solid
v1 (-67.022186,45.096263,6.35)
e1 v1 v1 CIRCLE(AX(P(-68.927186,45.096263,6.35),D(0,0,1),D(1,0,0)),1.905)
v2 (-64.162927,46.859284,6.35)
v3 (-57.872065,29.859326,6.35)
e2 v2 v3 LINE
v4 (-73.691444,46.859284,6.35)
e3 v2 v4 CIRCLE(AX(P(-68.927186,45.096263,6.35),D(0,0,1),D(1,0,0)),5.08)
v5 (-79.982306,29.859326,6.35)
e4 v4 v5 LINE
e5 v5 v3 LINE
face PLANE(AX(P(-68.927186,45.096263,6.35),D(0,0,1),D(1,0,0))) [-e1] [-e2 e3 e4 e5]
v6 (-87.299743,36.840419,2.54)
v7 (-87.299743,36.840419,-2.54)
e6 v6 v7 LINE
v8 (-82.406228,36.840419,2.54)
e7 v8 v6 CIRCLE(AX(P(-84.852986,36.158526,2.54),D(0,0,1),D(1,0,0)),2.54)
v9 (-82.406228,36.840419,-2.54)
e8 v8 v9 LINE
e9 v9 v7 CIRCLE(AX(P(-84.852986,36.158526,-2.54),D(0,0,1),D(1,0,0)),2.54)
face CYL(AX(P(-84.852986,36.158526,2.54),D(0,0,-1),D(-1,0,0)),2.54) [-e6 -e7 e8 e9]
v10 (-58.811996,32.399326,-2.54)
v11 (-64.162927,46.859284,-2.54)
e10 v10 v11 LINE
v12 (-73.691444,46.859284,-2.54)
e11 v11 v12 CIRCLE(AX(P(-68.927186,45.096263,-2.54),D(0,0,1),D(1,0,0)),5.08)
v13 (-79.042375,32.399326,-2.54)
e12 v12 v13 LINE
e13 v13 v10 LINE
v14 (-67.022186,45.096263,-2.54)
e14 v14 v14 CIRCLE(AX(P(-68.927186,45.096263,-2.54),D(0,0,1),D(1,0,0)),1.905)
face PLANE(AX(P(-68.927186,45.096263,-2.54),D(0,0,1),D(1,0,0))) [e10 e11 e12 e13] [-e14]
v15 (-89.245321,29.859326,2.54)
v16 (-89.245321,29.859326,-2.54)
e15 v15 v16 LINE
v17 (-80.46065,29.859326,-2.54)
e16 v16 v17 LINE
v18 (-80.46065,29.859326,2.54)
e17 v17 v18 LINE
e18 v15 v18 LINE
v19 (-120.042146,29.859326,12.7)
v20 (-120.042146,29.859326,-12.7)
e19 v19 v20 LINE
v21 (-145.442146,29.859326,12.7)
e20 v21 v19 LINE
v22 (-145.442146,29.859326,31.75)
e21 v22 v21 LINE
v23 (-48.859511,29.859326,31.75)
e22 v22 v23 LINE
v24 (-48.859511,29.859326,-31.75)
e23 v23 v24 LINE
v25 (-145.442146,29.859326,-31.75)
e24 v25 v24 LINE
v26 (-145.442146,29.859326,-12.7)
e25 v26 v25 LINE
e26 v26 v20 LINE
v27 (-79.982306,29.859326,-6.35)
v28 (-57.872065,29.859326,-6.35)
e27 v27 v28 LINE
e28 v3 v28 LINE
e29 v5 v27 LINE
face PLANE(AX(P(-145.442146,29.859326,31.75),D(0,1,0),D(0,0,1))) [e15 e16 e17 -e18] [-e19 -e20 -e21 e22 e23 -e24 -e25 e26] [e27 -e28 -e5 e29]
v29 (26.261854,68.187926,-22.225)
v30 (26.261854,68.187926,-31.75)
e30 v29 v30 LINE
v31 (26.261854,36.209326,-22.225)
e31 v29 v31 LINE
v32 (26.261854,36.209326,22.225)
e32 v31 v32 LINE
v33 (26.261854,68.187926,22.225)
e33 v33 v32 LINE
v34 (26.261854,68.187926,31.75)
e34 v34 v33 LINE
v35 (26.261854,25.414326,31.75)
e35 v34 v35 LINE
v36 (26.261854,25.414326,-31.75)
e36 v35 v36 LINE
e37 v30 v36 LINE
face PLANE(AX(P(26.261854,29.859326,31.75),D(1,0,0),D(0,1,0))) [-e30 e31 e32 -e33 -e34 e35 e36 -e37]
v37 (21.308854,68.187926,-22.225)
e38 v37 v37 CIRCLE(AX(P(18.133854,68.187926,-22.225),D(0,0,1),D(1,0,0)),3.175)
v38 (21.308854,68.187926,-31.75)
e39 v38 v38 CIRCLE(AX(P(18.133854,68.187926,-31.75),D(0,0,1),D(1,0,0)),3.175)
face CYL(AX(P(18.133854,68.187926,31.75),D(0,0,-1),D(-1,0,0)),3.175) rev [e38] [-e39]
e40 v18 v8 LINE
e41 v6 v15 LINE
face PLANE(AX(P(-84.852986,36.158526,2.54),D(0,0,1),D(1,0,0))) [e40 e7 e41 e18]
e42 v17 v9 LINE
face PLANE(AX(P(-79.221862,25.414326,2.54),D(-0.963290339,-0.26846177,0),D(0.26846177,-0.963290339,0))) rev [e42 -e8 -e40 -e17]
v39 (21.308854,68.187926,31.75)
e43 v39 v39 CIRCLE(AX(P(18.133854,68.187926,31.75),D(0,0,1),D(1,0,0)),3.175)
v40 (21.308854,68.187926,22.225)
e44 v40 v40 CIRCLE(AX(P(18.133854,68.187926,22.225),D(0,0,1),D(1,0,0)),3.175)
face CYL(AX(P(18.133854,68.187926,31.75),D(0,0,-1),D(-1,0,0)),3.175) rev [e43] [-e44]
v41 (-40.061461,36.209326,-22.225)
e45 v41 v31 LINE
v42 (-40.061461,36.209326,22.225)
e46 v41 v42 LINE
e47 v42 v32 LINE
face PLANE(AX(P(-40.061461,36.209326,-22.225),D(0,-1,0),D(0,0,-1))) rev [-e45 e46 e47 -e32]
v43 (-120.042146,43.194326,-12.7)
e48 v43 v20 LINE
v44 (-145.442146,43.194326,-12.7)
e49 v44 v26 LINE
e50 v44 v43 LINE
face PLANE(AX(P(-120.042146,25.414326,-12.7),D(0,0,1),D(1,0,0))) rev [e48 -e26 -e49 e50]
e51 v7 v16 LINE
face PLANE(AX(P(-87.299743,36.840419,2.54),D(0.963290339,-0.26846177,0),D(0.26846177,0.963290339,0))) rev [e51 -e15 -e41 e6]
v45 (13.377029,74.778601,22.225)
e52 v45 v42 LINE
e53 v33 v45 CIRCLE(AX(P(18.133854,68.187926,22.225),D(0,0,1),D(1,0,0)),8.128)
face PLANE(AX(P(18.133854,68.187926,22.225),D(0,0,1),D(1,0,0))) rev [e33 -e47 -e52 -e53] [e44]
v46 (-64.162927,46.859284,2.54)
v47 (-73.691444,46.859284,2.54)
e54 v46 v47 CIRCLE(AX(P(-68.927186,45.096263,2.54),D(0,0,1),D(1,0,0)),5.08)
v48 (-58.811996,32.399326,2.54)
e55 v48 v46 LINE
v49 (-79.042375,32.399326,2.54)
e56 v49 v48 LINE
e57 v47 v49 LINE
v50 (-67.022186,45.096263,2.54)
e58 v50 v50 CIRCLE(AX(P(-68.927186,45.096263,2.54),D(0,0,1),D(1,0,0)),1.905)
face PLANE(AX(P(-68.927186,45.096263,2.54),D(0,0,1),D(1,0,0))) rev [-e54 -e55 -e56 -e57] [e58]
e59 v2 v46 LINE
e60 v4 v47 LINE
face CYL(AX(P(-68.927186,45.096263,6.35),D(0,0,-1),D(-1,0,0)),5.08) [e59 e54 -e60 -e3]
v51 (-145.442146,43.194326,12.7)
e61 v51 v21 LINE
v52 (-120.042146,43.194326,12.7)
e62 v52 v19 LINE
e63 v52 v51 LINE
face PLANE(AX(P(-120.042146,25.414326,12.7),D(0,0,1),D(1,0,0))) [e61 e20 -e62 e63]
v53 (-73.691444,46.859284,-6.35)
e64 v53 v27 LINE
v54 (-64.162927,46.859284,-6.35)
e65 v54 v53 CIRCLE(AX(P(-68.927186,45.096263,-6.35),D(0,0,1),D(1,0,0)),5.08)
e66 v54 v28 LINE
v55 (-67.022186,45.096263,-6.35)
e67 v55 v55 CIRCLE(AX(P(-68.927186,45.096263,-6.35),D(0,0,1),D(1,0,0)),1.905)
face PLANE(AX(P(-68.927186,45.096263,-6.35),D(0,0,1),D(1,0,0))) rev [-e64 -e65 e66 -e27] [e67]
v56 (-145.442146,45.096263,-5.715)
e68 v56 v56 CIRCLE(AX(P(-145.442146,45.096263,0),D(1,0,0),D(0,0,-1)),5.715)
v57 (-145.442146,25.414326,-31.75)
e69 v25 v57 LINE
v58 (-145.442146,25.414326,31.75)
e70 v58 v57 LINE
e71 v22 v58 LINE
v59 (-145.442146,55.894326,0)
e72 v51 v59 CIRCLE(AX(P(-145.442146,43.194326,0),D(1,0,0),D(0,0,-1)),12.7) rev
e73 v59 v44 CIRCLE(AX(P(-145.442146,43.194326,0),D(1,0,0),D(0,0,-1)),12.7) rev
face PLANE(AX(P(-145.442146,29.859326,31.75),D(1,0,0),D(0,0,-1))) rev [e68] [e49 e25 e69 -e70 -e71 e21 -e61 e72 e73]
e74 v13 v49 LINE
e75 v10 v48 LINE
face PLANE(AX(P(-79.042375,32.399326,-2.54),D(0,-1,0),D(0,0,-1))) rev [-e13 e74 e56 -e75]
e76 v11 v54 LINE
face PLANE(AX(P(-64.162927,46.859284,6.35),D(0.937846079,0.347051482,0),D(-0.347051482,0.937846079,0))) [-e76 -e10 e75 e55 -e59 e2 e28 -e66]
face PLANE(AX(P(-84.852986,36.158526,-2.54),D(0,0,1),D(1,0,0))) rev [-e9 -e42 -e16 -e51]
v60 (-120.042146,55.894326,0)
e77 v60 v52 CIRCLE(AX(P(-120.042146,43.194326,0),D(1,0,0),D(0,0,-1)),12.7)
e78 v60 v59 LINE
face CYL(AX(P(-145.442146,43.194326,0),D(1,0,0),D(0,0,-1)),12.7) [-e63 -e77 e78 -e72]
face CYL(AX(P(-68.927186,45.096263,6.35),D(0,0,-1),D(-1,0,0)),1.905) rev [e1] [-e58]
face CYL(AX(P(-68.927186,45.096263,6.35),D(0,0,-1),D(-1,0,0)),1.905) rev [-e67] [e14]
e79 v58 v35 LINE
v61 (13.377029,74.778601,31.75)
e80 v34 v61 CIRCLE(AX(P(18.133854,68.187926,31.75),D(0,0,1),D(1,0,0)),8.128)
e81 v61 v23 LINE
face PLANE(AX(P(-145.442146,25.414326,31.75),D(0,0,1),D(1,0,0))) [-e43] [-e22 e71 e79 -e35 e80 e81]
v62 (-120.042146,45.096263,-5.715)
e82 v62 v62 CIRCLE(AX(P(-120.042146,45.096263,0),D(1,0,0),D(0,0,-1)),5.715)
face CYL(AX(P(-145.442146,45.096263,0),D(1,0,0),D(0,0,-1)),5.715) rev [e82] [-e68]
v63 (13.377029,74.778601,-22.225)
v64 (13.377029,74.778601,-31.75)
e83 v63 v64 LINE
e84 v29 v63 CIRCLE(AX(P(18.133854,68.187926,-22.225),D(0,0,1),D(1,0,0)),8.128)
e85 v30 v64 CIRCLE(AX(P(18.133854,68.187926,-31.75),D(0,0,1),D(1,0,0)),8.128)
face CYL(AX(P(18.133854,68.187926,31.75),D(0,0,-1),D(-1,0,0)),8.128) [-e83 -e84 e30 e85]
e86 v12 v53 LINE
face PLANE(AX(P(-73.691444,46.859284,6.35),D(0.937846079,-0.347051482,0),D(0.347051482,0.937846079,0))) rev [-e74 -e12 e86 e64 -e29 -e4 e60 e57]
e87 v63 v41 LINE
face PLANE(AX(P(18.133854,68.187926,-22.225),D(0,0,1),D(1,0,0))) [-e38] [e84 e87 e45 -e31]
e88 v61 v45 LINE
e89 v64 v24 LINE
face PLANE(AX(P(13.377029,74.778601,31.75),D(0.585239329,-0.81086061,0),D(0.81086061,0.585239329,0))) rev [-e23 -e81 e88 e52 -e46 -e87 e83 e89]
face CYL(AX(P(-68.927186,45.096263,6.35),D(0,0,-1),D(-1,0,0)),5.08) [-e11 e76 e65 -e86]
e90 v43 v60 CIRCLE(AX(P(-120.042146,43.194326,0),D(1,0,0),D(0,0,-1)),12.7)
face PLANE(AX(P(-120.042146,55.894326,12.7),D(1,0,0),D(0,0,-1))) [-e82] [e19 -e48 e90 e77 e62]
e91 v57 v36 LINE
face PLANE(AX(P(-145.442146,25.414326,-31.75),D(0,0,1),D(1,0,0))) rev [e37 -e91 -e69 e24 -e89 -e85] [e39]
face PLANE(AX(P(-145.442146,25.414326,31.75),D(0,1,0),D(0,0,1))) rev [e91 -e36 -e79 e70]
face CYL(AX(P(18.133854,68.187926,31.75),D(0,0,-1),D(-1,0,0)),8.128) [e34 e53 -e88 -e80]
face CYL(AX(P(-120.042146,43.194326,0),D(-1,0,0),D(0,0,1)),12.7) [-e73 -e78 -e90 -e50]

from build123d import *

# Parameters (mm, degrees)
SKETCH1_W           = 171.704
SKETCH1_H           = 4.445
BASE_EXTRUDE_DEPTH  = 31.75
SKETCH4_W           = 25.4
SKETCH4_H           = 30.48
BOSS_EXTRUDE3_DEPTH = 12.7
SKETCH5_R           = 5.715
CUT_EXTRUDE1_DEPTH  = 160.803312245
SKETCH3_R           = 1.905
BOSS_EXTRUDE1_DEPTH = 6.35
SKETCH2_R           = 3.175
BOSS_EXTRUDE2_DEPTH = 31.75
FILLET1_R           = 12.7
CUT_EXTRUDE2_DEPTH  = 2.54
CUT_EXTRUDE4_DEPTH  = 22.225
BOSS_EXTRUDE4_DEPTH = 2.54


with BuildPart() as part:
    # Sketch1 → Base-Extrude (new, symmetric)
    with BuildSketch(Plane.XY):
        with Locations((-59.590145552, 27.636826085)):
            Rectangle(SKETCH1_W, SKETCH1_H)
    extrude(amount=BASE_EXTRUDE_DEPTH, both=True)

    # Sketch4 → Boss-Extrude3 (add, symmetric)
    with BuildSketch(Plane.XY):
        with Locations((-132.742145552, 40.654326085)):
            Rectangle(SKETCH4_W, SKETCH4_H)
    extrude(amount=BOSS_EXTRUDE3_DEPTH, both=True)

    # Sketch5 → Cut-Extrude1 (cut, through all)
    with BuildSketch(Plane(origin=(-120.042145552, 0, 0), x_dir=(0, 0, -1), z_dir=(1, 0, 0))):
        with Locations((0, 45.096262506)):
            Circle(SKETCH5_R)
    extrude(amount=-CUT_EXTRUDE1_DEPTH, mode=Mode.SUBTRACT)

    # Sketch3 → Boss-Extrude1 (add, symmetric)
    with BuildSketch(Plane.XY):
        with BuildLine():
            Line((-81.627185552, 25.414326085), (-56.227185552, 25.414326085))
            Line((-56.227185552, 25.414326085), (-64.162927469, 46.859284036))
            ThreePointArc((-64.162927469, 46.859284036), (-68.927185552, 50.176262506), (-73.691443636, 46.859284036))
            Line((-73.691443636, 46.859284036), (-81.627185552, 25.414326085))
        make_face()
        with Locations((-68.927185552, 45.096262506)):
            Circle(SKETCH3_R, mode=Mode.SUBTRACT)
    extrude(amount=BOSS_EXTRUDE1_DEPTH, both=True)

    # Sketch2 → Boss-Extrude2 (add, symmetric)
    with BuildSketch(Plane.XY):
        with BuildLine():
            Line((-55.018145552, 25.414326085), (26.261854448, 25.414326085))
            Line((26.261854448, 25.414326085), (26.261854448, 68.187926085))
            ThreePointArc((26.261854448, 68.187926085), (21.835266898, 75.424218635), (13.377029184, 74.77860112))
            Line((13.377029184, 74.77860112), (-55.018145552, 25.414326085))
        make_face()
        with Locations((18.133854448, 68.187926085)):
            Circle(SKETCH2_R, mode=Mode.SUBTRACT)
    extrude(amount=BOSS_EXTRUDE2_DEPTH, both=True)

    # Fillet1
    fillet1_edges = [part.edges().sort_by_distance(p)[0] for p in [
        (-132.742145552, 55.894326085, 12.7),
        (-132.742145552, 55.894326085, -12.7),
    ]]
    fillet(fillet1_edges, radius=FILLET1_R - 0.0001)  # a hair under: the kernel refuses the full size

    # Sketch6 → Cut-Extrude2 (cut, symmetric)
    with BuildSketch(Plane.XY):
        with BuildLine():
            Line((-79.042374828, 32.399326085), (-58.811996277, 32.399326085))
            Line((-58.811996277, 32.399326085), (-64.162927469, 46.859284036))
            ThreePointArc((-64.162927469, 46.859284036), (-68.927185552, 50.176262506), (-73.691443636, 46.859284036))
            Line((-73.691443636, 46.859284036), (-79.042374828, 32.399326085))
        make_face()
    extrude(amount=CUT_EXTRUDE2_DEPTH, both=True, mode=Mode.SUBTRACT)

    # Sketch7 → Cut-Extrude4 (cut, symmetric)
    with BuildSketch(Plane.XY):
        with BuildLine():
            Line((13.377029184, 74.77860112), (-40.061460566, 36.209326085))
            Line((-40.061460566, 36.209326085), (26.261854448, 36.209326085))
            Line((26.261854448, 36.209326085), (26.261854448, 68.187926085))
            ThreePointArc((26.261854448, 68.187926085), (21.835266898, 75.424218635), (13.377029184, 74.77860112))
        make_face()
    extrude(amount=CUT_EXTRUDE4_DEPTH, both=True, mode=Mode.SUBTRACT)

    # Sketch8 → Boss-Extrude4 (add, symmetric)
    with BuildSketch(Plane.XY):
        with BuildLine():
            Line((-90.484109136, 25.414326085), (-79.221861969, 25.414326085))
            Line((-79.221861969, 25.414326085), (-82.40622809, 36.840418981))
            ThreePointArc((-82.40622809, 36.840418981), (-84.852985552, 38.698526085), (-87.299743015, 36.840418981))
            Line((-87.299743015, 36.840418981), (-90.484109136, 25.414326085))
        make_face()
    extrude(amount=BOSS_EXTRUDE4_DEPTH, both=True)


solid = part.part
